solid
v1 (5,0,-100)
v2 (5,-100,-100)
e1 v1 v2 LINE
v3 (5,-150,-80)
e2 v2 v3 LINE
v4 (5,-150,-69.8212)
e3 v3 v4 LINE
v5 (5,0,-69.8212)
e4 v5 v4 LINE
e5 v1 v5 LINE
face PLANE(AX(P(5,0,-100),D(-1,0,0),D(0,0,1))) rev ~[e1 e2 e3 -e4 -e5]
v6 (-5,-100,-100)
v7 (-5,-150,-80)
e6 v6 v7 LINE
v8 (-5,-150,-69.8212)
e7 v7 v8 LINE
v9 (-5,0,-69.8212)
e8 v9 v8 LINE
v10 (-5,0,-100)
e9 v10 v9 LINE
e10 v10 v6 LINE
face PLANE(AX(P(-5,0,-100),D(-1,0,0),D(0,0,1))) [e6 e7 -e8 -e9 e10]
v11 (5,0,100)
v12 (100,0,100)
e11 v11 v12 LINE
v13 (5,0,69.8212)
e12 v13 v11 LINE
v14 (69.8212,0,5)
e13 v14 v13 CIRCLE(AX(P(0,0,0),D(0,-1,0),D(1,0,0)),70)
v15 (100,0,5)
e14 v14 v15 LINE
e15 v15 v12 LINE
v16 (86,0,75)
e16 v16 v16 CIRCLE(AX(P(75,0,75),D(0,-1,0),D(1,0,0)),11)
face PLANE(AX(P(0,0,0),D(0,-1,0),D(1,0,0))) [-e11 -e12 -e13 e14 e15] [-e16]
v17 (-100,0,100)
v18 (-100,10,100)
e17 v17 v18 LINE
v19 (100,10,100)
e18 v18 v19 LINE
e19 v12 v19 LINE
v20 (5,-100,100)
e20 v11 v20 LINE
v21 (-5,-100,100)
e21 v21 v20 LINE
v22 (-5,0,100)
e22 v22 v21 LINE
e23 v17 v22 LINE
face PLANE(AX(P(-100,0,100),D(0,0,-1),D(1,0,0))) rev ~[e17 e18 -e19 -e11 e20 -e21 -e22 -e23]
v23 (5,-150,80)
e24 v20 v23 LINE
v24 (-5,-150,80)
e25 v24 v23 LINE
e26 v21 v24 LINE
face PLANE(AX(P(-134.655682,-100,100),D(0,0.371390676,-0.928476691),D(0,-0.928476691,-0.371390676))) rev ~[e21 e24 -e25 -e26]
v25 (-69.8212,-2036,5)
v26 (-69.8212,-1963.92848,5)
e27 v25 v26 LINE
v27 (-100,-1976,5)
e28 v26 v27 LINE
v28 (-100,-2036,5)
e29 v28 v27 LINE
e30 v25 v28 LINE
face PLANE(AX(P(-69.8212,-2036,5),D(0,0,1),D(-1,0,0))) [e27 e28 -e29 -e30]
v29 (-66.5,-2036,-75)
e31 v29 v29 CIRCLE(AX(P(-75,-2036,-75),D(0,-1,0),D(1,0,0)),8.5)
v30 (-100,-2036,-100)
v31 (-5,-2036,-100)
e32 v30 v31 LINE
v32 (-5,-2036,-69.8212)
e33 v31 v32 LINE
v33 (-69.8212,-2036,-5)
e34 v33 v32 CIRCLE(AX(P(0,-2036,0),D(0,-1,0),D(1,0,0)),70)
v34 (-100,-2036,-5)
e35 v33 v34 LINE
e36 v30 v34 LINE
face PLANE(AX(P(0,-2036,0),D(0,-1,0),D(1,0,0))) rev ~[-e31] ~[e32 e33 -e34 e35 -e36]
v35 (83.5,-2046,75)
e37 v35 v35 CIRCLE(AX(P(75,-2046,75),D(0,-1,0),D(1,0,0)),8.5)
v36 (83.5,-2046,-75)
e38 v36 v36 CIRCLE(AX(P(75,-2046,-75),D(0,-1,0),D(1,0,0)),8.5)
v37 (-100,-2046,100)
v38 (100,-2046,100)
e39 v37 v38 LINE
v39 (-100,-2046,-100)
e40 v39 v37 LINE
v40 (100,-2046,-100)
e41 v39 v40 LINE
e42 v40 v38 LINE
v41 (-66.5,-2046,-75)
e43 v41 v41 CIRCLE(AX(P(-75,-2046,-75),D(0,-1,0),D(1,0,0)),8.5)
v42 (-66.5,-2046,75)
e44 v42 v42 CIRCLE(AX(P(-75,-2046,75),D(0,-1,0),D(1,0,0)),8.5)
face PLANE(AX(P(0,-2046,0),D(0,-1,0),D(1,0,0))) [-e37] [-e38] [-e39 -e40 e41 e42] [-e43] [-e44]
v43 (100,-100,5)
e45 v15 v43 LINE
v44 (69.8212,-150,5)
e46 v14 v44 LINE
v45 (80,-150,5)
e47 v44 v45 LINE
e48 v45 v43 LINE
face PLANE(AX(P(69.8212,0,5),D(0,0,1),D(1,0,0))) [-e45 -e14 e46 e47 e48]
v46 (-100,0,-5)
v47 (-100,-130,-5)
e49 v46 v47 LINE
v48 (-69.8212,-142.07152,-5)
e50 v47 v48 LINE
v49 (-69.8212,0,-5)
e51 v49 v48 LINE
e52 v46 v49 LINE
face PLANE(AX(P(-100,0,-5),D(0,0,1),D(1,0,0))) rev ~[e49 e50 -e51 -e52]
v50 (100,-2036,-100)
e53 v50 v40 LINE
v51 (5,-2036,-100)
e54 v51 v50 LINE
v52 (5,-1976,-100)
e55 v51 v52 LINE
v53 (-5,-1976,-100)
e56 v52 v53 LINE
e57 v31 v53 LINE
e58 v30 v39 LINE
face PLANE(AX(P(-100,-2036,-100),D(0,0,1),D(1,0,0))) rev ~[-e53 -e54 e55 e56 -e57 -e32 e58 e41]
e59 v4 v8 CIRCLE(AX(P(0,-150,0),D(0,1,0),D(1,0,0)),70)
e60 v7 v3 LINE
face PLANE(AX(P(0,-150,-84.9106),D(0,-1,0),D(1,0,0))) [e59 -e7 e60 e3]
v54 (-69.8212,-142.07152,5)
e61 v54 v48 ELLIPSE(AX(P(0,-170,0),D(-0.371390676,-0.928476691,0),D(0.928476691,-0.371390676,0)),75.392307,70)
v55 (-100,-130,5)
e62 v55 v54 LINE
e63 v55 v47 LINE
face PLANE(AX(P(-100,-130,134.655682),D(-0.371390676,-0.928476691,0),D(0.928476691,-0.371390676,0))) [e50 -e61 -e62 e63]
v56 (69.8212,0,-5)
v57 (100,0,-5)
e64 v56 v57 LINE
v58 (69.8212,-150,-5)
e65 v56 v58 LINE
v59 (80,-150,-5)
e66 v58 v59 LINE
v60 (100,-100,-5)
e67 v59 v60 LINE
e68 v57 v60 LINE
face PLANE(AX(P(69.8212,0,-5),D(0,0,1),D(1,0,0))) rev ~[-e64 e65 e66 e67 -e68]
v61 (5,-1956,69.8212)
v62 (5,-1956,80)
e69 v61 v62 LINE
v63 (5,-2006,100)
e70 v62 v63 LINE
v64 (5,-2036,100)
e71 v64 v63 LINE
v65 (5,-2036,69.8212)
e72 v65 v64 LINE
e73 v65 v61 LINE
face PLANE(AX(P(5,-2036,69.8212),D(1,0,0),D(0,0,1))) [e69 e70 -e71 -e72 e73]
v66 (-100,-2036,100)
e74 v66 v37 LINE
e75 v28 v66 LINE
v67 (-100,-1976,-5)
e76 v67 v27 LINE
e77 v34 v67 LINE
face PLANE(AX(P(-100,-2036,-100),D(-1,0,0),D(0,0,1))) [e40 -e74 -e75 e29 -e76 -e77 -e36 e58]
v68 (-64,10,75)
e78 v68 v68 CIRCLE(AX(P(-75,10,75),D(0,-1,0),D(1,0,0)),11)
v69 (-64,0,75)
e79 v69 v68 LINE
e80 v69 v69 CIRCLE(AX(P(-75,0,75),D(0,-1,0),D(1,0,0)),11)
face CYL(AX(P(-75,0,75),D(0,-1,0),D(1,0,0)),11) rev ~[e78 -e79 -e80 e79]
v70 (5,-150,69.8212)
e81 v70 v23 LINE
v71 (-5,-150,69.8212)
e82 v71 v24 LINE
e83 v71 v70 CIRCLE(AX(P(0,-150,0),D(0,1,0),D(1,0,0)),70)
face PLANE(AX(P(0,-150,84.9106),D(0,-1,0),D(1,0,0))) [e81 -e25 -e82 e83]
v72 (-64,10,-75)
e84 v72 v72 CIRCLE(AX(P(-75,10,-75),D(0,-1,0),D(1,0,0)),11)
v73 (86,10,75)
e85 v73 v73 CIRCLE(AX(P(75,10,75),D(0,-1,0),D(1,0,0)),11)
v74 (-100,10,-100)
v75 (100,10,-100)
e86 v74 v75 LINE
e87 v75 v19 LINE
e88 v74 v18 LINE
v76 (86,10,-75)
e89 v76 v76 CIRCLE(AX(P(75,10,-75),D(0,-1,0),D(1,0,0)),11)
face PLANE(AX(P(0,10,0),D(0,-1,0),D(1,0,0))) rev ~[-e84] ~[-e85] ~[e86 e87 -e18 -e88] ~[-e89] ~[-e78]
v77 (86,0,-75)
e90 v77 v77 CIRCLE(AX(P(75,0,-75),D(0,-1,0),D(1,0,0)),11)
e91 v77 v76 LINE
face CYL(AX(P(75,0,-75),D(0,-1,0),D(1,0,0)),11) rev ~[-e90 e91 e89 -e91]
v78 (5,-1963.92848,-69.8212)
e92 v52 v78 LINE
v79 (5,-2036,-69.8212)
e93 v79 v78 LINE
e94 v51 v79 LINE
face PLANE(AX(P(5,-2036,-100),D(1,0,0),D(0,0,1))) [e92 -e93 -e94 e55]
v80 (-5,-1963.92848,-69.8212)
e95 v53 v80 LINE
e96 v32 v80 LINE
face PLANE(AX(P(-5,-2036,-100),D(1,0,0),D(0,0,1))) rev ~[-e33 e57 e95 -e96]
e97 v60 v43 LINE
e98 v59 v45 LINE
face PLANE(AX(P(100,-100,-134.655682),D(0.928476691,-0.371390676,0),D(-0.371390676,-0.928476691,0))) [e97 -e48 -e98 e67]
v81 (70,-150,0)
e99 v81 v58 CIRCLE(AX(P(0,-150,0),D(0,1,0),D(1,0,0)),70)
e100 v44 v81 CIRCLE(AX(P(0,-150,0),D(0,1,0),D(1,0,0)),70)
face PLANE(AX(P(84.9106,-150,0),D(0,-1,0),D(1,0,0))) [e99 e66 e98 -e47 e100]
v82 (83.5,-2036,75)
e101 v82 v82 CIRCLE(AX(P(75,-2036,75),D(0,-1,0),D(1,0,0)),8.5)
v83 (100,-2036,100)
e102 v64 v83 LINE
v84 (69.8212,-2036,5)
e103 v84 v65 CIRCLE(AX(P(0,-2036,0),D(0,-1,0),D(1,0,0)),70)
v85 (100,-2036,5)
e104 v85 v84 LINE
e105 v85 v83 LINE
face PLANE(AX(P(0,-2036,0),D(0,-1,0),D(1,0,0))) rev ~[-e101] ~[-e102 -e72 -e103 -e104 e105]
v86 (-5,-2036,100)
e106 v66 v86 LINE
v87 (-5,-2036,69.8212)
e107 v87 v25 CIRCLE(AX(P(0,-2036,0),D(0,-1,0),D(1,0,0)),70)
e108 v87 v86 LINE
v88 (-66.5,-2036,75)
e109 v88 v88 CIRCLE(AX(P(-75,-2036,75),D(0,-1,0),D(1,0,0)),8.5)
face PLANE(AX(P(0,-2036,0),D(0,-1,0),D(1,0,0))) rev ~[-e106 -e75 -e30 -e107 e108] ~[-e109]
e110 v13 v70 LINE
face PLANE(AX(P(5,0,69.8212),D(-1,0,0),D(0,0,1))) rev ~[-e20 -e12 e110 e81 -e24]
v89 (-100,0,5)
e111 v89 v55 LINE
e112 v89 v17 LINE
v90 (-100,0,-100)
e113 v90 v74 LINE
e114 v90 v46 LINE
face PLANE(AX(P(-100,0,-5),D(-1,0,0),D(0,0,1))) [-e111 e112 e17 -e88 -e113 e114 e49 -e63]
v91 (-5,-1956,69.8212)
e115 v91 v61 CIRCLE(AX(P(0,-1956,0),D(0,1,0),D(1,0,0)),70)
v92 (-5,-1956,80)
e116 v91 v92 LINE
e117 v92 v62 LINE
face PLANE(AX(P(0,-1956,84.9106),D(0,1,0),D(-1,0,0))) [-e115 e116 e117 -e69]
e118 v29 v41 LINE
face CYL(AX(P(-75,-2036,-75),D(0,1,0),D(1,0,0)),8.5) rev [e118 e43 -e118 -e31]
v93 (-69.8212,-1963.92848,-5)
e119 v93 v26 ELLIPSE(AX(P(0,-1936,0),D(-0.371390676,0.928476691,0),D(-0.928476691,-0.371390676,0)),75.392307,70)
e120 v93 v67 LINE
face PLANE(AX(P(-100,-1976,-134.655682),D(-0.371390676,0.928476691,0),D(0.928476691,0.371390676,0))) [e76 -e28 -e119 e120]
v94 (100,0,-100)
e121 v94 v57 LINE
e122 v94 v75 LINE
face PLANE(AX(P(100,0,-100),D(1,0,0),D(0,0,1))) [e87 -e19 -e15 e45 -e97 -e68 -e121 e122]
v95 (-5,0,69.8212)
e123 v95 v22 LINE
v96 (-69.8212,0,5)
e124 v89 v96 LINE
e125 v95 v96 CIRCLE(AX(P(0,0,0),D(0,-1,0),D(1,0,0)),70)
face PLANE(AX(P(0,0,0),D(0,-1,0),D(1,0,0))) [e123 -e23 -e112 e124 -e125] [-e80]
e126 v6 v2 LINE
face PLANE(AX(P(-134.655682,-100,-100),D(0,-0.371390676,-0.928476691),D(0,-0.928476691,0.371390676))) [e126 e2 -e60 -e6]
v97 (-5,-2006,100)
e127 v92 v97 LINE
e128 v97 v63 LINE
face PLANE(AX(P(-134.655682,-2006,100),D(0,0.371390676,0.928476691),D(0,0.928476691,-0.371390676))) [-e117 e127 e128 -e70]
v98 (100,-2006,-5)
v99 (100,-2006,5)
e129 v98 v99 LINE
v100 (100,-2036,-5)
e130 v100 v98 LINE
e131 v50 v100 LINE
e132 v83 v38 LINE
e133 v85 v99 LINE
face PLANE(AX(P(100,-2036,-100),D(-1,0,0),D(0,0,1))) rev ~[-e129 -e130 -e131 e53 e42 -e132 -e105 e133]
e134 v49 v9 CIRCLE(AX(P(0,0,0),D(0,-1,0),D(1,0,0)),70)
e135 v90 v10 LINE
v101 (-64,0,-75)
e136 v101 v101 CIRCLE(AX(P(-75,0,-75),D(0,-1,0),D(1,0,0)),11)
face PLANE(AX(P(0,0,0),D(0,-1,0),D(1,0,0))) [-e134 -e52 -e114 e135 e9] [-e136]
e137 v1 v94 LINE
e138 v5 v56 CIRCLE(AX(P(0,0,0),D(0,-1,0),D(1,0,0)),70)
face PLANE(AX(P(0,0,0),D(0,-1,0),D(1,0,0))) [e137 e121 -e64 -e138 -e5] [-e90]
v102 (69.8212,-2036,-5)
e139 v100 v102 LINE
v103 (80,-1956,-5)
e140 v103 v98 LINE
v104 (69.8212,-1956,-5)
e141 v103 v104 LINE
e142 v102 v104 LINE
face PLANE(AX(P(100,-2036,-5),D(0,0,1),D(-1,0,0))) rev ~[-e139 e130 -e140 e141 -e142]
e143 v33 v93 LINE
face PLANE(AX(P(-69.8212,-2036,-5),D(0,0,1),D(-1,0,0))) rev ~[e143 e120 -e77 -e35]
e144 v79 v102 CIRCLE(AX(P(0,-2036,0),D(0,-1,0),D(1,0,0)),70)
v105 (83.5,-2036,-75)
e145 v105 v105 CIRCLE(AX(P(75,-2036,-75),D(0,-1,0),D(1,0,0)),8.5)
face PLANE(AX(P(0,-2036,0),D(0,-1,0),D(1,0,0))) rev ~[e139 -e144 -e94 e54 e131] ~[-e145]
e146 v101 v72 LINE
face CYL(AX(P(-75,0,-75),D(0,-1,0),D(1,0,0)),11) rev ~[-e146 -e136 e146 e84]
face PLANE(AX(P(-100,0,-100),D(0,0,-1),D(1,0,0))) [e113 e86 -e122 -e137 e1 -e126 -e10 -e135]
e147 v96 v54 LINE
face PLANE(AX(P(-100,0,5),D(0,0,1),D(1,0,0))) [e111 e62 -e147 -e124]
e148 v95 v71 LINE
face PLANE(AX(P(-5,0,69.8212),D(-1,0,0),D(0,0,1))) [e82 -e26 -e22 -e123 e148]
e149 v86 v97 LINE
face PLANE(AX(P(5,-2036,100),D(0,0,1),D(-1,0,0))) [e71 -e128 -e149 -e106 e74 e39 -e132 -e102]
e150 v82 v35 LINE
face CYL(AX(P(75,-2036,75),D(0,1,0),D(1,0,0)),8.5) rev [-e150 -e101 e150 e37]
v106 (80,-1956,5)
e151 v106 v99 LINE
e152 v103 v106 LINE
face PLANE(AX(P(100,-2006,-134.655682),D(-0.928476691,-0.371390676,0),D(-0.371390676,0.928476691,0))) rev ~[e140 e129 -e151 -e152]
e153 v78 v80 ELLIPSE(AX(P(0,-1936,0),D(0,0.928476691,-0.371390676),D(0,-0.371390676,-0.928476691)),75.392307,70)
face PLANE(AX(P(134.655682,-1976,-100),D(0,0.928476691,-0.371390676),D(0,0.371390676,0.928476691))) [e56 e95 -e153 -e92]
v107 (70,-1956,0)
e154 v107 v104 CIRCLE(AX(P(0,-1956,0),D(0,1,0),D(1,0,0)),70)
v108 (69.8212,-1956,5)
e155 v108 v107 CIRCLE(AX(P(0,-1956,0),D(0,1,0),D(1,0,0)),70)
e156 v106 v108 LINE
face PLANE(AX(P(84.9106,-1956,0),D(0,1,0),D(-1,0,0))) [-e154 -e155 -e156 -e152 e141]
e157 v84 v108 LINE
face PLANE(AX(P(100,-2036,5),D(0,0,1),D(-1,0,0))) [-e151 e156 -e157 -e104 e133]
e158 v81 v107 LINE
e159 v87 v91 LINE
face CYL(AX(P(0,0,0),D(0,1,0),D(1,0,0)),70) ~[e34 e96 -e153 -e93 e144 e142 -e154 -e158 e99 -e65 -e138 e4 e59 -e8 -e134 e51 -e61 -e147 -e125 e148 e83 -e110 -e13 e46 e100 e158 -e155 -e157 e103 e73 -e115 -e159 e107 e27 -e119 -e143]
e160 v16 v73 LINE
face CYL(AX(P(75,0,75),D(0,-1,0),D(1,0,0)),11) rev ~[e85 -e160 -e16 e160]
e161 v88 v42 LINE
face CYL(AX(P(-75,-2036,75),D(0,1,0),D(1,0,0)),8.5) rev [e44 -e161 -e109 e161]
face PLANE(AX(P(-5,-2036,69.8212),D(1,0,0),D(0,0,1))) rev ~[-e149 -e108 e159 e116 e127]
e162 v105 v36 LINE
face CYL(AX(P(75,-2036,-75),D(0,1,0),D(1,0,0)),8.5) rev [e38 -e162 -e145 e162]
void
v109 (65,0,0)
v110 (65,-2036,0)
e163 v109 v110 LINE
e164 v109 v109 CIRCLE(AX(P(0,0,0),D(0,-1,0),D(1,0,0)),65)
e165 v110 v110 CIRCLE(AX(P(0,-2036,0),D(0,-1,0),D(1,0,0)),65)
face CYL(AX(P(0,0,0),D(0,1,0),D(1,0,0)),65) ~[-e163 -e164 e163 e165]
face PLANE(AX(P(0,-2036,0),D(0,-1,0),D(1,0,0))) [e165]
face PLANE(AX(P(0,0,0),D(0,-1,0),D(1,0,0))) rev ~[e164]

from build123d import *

# Parameters (mm, degrees)
F0_R          = 70
F0_R_2        = 65
F1_DEPTH      = 2036
F2_W          = 200
F2_H          = 200
F2_R          = 11
F3_DEPTH      = 10
F4_W          = 30.1787997812
F4_H          = 10
F4_W_2        = 10
F4_H_2        = 30.1787997812
F5_DEPTH      = 150
F6_T1_DEPTH   = 269.311363913
F6_T3_DEPTH   = 269.311363913
F6_T8_DEPTH   = 269.311363913
F6_S9_R       = 70
F6_T10_DEPTH  = 139
F8_W          = 200
F8_H          = 200
F8_R          = 8.5
F9_DEPTH      = 10
F10_W         = 10
F10_H         = 30.1787997812
F10_W_2       = 30.1787997812
F10_H_2       = 10
F11_DEPTH     = 80
F12_T1_DEPTH  = 269.311363913
F12_T3_DEPTH  = 269.311363913
F12_T8_DEPTH  = 269.311363913
F12_S9_R      = 70
F12_T10_DEPTH = 139
F12_T14_DEPTH = 269.311363913
F12_S15_R     = 70
F12_T16_DEPTH = 139


# Not quite as in the source:
# - a fillet or chamfer that OpenCascade refuses, or shapes differently, is made with other operations: its cross-section is extruded or revolved along the edge and cut away or added


with BuildPart() as f1:
    # F0 (on Front) → F1 (new body)
    with BuildSketch(Plane.XZ):
        Circle(F0_R)
        Circle(F0_R_2, mode=Mode.SUBTRACT)
    extrude(amount=F1_DEPTH)

    # F2 (on Front) → F3 (join)
    with BuildSketch(Plane.XZ):
        Rectangle(F2_W, F2_H)
        with Locations((-75, -75)):
            Circle(F2_R, mode=Mode.SUBTRACT)
        with Locations((75, -75)):
            Circle(F2_R, mode=Mode.SUBTRACT)
        with Locations((-75, 75)):
            Circle(F2_R, mode=Mode.SUBTRACT)
        with Locations((75, 75)):
            Circle(F2_R, mode=Mode.SUBTRACT)
    extrude(amount=-F3_DEPTH)

    # F4 (on Front) → F5 (join)
    with BuildSketch(Plane.XZ):
        with Locations((-84.9106001094, 0)):
            Rectangle(F4_W, F4_H)
        with Locations((0, 84.9106001094)):
            Rectangle(F4_W_2, F4_H_2)
        with Locations((84.9106001094, 0)):
            Rectangle(F4_W, F4_H)
        with Locations((0, -84.9106001094)):
            Rectangle(F4_W_2, F4_H_2)
    extrude(amount=F5_DEPTH)

    # F6: chamfer of 50 x 20 on 4 edges, made by hand

    # F6_s2 → F6_t1 (cut)
    with BuildSketch(Plane.YZ.offset(-134.6556819565)):
        Polygon((-100, 100), (-150, 80), (-150, 100), align=None)
        Polygon((-100, -100), (-150, -80), (-150, -100), align=None)
    extrude(amount=F6_T1_DEPTH, mode=Mode.SUBTRACT)

    # F6_s4 → F6_t3 (cut)
    with BuildSketch(Plane.XY.offset(-134.6556819565)):
        Polygon((100, -100), (80, -150), (100, -150), align=None)
    extrude(amount=F6_T3_DEPTH, mode=Mode.SUBTRACT)


with BuildPart() as f6_tool6:
    # F6_s7 → F6_t8 (new body)
    with BuildSketch(Plane.XY.offset(134.6556819565)):
        Polygon((-100, -130), (-50, -150), (-100, -150), align=None)
    extrude(amount=-F6_T8_DEPTH)

    # F6_s9 → F6_t10 (cut, symmetric)
    with BuildSketch(Plane.XZ.offset(140)):
        Circle(F6_S9_R)
    extrude(amount=F6_T10_DEPTH, both=True, mode=Mode.SUBTRACT)


with BuildPart() as f1_1:
    add(f1.part)

    # F6_t5: cut F6_tool6
    add(f6_tool6.part, mode=Mode.SUBTRACT)

    # F8 (on offset) → F9 (join)
    with BuildSketch(Plane.XZ.offset(2036)):
        Rectangle(F8_W, F8_H)
        with Locations((-75, -75)):
            Circle(F8_R, mode=Mode.SUBTRACT)
        with Locations((75, -75)):
            Circle(F8_R, mode=Mode.SUBTRACT)
        with Locations((-75, 75)):
            Circle(F8_R, mode=Mode.SUBTRACT)
        with Locations((75, 75)):
            Circle(F8_R, mode=Mode.SUBTRACT)
    extrude(amount=F9_DEPTH)

    # F10 (on face) → F11 (join)
    with BuildSketch(Plane(origin=(0, -2036, 0), x_dir=(-1, 0, 0), z_dir=(0, 1, 0))):
        with Locations((0, 84.9106001094)):
            Rectangle(F10_W, F10_H)
        with Locations((84.9106001094, 0)):
            Rectangle(F10_W_2, F10_H_2)
        with Locations((0, -84.9106001094)):
            Rectangle(F10_W, F10_H)
        with Locations((-84.9106001094, 0)):
            Rectangle(F10_W_2, F10_H_2)
    extrude(amount=F11_DEPTH)

    # F12: chamfer of 20 x 50 on 4 edges, made by hand

    # F12_s2 → F12_t1 (cut)
    with BuildSketch(Plane.YZ.offset(-134.6556819565)):
        Polygon((-2006, 100), (-1956, 80), (-1956, 100), align=None)
    extrude(amount=F12_T1_DEPTH, mode=Mode.SUBTRACT)

    # F12_s4 → F12_t3 (cut)
    with BuildSketch(Plane.XY.offset(-134.6556819565)):
        Polygon((100, -2006), (80, -1956), (100, -1956), align=None)
    extrude(amount=F12_T3_DEPTH, mode=Mode.SUBTRACT)


with BuildPart() as f12_tool6:
    # F12_s7 → F12_t8 (new body)
    with BuildSketch(Plane.XY.offset(-134.6556819565)):
        Polygon((-100, -1976), (-50, -1956), (-100, -1956), align=None)
    extrude(amount=F12_T8_DEPTH)

    # F12_s9 → F12_t10 (cut, symmetric)
    with BuildSketch(Plane.XZ.offset(1966)):
        Circle(F12_S9_R)
    extrude(amount=F12_T10_DEPTH, both=True, mode=Mode.SUBTRACT)


with BuildPart() as f1_2:
    add(f1_1.part)

    # F12_t5: cut F12_tool6
    add(f12_tool6.part, mode=Mode.SUBTRACT)


with BuildPart() as f12_tool12:
    # F12_s13 → F12_t14 (new body)
    with BuildSketch(Plane.YZ.offset(134.6556819565)):
        Polygon((-1976, -100), (-1956, -50), (-1956, -100), align=None)
    extrude(amount=-F12_T14_DEPTH)

    # F12_s15 → F12_t16 (cut, symmetric)
    with BuildSketch(Plane.XZ.offset(1966)):
        Circle(F12_S15_R)
    extrude(amount=F12_T16_DEPTH, both=True, mode=Mode.SUBTRACT)


with BuildPart() as f1_3:
    add(f1_2.part)

    # F12_t11: cut F12_tool12
    add(f12_tool12.part, mode=Mode.SUBTRACT)


solid = f1_3.part
